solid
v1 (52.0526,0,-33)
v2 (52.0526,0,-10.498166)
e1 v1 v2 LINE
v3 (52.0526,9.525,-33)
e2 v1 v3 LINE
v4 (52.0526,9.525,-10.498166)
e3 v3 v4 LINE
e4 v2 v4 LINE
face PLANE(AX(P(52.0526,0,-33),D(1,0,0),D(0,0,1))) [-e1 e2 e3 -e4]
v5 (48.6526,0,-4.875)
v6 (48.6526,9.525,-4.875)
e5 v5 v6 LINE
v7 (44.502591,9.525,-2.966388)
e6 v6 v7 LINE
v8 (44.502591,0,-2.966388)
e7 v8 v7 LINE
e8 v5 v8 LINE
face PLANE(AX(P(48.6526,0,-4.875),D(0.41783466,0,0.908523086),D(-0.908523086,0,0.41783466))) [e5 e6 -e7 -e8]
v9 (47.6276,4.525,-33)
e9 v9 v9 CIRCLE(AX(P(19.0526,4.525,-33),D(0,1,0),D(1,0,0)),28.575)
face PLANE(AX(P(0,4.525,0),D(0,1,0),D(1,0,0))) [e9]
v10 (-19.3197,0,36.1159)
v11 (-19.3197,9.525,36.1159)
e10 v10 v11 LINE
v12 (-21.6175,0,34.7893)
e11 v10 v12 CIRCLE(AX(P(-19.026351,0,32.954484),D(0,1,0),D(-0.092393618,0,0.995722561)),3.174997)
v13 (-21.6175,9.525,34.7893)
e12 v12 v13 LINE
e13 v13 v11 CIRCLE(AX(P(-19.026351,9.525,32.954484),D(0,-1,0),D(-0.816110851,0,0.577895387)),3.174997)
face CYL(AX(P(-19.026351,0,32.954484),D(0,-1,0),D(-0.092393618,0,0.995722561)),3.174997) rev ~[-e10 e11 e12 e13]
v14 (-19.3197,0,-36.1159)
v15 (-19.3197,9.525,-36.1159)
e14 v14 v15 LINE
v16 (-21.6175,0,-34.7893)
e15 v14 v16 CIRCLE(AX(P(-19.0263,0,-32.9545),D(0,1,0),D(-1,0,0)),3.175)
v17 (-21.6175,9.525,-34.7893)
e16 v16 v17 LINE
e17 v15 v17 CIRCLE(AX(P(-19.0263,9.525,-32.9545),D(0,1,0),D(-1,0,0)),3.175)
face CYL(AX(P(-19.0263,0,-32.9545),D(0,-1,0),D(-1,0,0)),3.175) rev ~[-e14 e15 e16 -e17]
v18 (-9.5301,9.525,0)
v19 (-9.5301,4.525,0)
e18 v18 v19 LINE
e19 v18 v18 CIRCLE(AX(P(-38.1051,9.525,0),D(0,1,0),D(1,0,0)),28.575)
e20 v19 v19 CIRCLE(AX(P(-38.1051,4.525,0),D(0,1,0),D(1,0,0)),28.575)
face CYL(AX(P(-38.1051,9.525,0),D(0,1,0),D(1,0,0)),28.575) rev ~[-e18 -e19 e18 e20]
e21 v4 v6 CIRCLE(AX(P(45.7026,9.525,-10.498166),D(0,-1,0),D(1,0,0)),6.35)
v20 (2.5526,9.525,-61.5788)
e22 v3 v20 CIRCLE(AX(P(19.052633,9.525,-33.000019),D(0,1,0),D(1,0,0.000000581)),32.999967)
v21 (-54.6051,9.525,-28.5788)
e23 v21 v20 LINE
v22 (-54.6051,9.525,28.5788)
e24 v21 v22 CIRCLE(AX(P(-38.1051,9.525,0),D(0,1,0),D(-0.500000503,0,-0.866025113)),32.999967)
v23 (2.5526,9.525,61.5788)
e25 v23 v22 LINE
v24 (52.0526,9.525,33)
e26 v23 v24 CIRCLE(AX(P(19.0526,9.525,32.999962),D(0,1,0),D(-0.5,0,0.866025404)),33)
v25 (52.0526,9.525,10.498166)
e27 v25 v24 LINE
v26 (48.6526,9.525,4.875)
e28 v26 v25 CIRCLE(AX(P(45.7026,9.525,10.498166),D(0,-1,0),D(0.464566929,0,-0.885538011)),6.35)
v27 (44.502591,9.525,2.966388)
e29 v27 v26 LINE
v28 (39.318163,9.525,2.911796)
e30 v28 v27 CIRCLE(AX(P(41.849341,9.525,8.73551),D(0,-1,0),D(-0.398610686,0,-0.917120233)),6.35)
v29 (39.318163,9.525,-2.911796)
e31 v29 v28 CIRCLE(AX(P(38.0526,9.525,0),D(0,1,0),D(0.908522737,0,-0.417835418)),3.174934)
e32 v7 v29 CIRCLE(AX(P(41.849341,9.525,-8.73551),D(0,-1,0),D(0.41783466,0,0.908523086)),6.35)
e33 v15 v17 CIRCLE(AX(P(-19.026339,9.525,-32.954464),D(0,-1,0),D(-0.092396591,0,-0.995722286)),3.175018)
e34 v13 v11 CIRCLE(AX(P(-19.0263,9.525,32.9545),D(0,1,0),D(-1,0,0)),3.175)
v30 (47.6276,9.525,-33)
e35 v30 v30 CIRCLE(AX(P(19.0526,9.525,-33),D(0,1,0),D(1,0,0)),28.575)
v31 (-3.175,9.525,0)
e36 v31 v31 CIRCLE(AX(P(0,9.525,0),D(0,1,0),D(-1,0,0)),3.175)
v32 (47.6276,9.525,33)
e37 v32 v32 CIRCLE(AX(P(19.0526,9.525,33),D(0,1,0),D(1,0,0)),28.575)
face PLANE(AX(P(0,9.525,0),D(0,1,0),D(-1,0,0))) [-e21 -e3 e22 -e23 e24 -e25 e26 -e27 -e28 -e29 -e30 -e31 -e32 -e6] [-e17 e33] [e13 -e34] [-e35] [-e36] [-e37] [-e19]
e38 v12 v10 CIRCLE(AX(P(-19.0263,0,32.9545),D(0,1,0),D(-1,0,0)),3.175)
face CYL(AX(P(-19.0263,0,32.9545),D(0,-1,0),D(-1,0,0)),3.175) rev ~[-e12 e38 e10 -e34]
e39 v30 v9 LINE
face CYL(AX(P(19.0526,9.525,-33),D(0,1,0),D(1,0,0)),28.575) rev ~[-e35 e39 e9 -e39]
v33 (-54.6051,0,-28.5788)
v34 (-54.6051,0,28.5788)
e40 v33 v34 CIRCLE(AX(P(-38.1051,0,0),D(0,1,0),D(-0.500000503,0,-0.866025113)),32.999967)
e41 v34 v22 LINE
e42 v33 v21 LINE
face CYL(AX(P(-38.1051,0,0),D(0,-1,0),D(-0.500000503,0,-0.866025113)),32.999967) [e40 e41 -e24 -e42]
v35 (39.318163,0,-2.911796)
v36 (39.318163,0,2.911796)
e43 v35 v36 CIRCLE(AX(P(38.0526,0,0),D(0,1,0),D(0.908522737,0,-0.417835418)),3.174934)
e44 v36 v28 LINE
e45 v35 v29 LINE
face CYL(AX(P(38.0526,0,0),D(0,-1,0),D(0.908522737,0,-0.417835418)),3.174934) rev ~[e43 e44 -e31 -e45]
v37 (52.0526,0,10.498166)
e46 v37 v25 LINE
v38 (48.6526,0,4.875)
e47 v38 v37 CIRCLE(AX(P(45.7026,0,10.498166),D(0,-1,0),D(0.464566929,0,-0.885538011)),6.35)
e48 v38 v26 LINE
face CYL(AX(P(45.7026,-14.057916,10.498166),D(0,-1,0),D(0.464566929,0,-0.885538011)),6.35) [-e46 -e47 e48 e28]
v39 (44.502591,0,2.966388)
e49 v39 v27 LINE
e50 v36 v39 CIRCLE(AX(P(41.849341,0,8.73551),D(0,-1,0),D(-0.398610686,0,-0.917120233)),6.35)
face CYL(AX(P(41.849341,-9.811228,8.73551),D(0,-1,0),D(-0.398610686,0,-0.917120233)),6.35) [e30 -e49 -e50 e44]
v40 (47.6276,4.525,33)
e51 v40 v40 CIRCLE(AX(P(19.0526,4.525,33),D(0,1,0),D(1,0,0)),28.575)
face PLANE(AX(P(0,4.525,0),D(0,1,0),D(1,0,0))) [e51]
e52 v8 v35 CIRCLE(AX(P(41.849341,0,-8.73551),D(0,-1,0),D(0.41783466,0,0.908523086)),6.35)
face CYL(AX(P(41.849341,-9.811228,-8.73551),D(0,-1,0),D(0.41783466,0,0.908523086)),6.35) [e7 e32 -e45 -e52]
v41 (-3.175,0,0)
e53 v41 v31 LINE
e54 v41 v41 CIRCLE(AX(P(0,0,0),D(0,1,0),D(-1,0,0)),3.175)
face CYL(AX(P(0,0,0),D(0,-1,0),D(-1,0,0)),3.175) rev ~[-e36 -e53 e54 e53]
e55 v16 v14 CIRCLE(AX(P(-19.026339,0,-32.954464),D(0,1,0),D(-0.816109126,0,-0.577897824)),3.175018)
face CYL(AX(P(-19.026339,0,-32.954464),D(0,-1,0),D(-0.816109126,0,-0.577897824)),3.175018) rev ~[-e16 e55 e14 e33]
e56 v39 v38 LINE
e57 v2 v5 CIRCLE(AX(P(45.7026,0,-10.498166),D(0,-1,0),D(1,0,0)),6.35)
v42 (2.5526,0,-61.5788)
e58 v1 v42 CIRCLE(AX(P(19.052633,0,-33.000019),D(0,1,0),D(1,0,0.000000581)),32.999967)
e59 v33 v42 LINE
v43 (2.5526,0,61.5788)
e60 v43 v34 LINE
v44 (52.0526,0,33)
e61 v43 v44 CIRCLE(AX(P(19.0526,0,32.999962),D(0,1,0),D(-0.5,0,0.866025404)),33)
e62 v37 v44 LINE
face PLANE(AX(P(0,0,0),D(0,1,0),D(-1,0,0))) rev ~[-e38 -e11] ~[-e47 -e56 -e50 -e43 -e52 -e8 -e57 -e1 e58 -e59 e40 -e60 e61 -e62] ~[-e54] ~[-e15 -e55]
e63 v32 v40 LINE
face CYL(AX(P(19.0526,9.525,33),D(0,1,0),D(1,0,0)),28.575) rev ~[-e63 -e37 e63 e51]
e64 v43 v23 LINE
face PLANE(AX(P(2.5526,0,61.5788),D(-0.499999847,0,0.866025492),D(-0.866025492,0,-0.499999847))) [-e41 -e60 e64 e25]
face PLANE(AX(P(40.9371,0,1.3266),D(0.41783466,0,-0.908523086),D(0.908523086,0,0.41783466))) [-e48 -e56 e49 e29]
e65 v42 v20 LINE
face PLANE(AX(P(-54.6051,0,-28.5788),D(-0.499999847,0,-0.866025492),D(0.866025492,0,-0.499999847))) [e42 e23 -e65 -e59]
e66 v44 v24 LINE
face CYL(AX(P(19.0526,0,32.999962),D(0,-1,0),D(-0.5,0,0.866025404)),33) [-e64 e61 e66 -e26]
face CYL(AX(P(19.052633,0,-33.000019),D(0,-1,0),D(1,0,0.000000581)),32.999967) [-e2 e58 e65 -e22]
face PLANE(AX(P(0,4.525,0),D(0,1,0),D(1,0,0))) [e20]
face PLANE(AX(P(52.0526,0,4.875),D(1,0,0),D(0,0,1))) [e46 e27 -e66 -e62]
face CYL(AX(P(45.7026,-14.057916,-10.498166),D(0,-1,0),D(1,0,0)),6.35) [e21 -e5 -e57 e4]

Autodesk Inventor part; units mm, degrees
ref_plane "YZ Plane" through (0, 0, 0) normal (1, 0, 0) x (0, 1, 0)
ref_plane "XZ Plane" through (0, 0, 0) normal (0, 1, 0) x (-1, 0, 0)
ref_plane "XY Plane" through (0, 0, 0) normal (0, 0, 1) x (1, 0, 0)
sketch "Sketch1" plane through (0, 0, 0) normal (0, 1, 0) x (-1, 0, 0)
  line L0 (54.6051, -28.5788) -> (-2.5526, -61.5788)
  line L1 (-52.0526, -33) -> (-52.0526, 33)
  line L2 (-2.5526, 61.5788) -> (54.6051, 28.5788)
  circle A0 centre (38.1051, 0) radius 33 construction
  circle A1 centre (-19.0526, 33) radius 33 construction
  circle A2 centre (-19.0526, -33) radius 33 construction
  arc A3 (54.6051, -28.5788) -> (54.6051, 28.5788) centre (38.1051, 0) ccw
  arc A4 (-52.0526, -33) -> (-2.5526, -61.5788) centre (-19.0526, -33) ccw
  arc A5 (-2.5526, 61.5788) -> (-52.0526, 33) centre (-19.0526, 33) ccw
  circle A6 centre (0, 0) radius 3.175
  line L3 (-52.0526, -4.875) -> (-48.6526, -4.875)
  line L4 (-48.6526, -4.875) -> (-40.9371, -1.3266)
  line L5 (-40.9371, 1.3266) -> (-48.6526, 4.875)
  line L6 (-48.6526, 4.875) -> (-52.0526, 4.875)
  arc A7 (-40.9371, -1.3266) -> (-40.9371, 1.3266) centre (-38.0526, 0) ccw
  line L7 (-40.9371, -1.3266) -> (-38.0526, 0) construction
  line L8 (-38.0526, 0) -> (-40.9371, 1.3266) construction
  arc A8 (21.6175, -34.7893) -> (19.3197, -36.1159) centre (19.0263, -32.9545) ccw
  arc A9 (19.3197, 36.1159) -> (21.6175, 34.7893) centre (19.0263, 32.9545) ccw
  circle A10 centre (19.0263, 32.9545) radius 3.175
  circle A11 centre (19.0263, -32.9545) radius 3.175
  point P0 (-52.0526, 0)
  point P1 (-52.0526, 0)
  point P2 (21.6175, -34.7893)
  point P3 (21.6175, 34.7893)
  dimension "d1" = 66
  dimension "d14" = 6.35
  dimension "d15" = 9.75
  dimension "d16" = 3.4
  dimension "d18" = 10.6
  dimension "d20" = 6.35
  dimension "d23" = 360
extrude "Extrusion1" add sketch "Sketch1" along normal blind 9.525 contours L0 A4 L1 L3 L4 A7 L5 L6 A5 L2 A3
sketch "Sketch2" plane through (0, 9.525, 0) normal (0, 1, 0) x (1, 0, 0)
  circle A0 centre (19.0526, -33) radius 28.575
  circle A1 centre (-38.1051, 0) radius 28.575
  circle A2 centre (19.0526, 33) radius 28.575
  circle A3 centre (19.0526, 33) radius 33
  circle A4 centre (-38.1051, 0) radius 33
  circle A5 centre (19.0526, -33) radius 33
  line L0 (-54.6051, -28.5788) -> (2.5526, -61.5788) projected
  line L1 (2.5526, 61.5788) -> (-54.6051, 28.5788) projected
  line L2 (52.0526, -33) -> (52.0526, 33) projected
  point P0 (0, 0)
  point P1 (-99.3426, -2.7496)
  point P2 (47.2901, -87.408)
  point P3 (47.2901, 87.408)
  point P4 (-99.3426, 2.7496)
  point P5 (52.0526, -84.6584)
  point P6 (52.0526, 84.6584)
  dimension "d5" = 57.15
extrude "Extrusion2" cut sketch "Sketch2" against normal blind 5 contours A0 | A1 | A2
fillet "Fillet2" radius 6.35 4 edges at (52.0526, 4.7625, -4.875) (52.0526, 4.7625, 4.875) (40.9371, 4.7625, -1.3266) (40.9371, 4.7625, 1.3266)
properties part number "BOTTOM_PLATE_WEIGHTS_TREBUCHET" material "Wood (Birch)"
